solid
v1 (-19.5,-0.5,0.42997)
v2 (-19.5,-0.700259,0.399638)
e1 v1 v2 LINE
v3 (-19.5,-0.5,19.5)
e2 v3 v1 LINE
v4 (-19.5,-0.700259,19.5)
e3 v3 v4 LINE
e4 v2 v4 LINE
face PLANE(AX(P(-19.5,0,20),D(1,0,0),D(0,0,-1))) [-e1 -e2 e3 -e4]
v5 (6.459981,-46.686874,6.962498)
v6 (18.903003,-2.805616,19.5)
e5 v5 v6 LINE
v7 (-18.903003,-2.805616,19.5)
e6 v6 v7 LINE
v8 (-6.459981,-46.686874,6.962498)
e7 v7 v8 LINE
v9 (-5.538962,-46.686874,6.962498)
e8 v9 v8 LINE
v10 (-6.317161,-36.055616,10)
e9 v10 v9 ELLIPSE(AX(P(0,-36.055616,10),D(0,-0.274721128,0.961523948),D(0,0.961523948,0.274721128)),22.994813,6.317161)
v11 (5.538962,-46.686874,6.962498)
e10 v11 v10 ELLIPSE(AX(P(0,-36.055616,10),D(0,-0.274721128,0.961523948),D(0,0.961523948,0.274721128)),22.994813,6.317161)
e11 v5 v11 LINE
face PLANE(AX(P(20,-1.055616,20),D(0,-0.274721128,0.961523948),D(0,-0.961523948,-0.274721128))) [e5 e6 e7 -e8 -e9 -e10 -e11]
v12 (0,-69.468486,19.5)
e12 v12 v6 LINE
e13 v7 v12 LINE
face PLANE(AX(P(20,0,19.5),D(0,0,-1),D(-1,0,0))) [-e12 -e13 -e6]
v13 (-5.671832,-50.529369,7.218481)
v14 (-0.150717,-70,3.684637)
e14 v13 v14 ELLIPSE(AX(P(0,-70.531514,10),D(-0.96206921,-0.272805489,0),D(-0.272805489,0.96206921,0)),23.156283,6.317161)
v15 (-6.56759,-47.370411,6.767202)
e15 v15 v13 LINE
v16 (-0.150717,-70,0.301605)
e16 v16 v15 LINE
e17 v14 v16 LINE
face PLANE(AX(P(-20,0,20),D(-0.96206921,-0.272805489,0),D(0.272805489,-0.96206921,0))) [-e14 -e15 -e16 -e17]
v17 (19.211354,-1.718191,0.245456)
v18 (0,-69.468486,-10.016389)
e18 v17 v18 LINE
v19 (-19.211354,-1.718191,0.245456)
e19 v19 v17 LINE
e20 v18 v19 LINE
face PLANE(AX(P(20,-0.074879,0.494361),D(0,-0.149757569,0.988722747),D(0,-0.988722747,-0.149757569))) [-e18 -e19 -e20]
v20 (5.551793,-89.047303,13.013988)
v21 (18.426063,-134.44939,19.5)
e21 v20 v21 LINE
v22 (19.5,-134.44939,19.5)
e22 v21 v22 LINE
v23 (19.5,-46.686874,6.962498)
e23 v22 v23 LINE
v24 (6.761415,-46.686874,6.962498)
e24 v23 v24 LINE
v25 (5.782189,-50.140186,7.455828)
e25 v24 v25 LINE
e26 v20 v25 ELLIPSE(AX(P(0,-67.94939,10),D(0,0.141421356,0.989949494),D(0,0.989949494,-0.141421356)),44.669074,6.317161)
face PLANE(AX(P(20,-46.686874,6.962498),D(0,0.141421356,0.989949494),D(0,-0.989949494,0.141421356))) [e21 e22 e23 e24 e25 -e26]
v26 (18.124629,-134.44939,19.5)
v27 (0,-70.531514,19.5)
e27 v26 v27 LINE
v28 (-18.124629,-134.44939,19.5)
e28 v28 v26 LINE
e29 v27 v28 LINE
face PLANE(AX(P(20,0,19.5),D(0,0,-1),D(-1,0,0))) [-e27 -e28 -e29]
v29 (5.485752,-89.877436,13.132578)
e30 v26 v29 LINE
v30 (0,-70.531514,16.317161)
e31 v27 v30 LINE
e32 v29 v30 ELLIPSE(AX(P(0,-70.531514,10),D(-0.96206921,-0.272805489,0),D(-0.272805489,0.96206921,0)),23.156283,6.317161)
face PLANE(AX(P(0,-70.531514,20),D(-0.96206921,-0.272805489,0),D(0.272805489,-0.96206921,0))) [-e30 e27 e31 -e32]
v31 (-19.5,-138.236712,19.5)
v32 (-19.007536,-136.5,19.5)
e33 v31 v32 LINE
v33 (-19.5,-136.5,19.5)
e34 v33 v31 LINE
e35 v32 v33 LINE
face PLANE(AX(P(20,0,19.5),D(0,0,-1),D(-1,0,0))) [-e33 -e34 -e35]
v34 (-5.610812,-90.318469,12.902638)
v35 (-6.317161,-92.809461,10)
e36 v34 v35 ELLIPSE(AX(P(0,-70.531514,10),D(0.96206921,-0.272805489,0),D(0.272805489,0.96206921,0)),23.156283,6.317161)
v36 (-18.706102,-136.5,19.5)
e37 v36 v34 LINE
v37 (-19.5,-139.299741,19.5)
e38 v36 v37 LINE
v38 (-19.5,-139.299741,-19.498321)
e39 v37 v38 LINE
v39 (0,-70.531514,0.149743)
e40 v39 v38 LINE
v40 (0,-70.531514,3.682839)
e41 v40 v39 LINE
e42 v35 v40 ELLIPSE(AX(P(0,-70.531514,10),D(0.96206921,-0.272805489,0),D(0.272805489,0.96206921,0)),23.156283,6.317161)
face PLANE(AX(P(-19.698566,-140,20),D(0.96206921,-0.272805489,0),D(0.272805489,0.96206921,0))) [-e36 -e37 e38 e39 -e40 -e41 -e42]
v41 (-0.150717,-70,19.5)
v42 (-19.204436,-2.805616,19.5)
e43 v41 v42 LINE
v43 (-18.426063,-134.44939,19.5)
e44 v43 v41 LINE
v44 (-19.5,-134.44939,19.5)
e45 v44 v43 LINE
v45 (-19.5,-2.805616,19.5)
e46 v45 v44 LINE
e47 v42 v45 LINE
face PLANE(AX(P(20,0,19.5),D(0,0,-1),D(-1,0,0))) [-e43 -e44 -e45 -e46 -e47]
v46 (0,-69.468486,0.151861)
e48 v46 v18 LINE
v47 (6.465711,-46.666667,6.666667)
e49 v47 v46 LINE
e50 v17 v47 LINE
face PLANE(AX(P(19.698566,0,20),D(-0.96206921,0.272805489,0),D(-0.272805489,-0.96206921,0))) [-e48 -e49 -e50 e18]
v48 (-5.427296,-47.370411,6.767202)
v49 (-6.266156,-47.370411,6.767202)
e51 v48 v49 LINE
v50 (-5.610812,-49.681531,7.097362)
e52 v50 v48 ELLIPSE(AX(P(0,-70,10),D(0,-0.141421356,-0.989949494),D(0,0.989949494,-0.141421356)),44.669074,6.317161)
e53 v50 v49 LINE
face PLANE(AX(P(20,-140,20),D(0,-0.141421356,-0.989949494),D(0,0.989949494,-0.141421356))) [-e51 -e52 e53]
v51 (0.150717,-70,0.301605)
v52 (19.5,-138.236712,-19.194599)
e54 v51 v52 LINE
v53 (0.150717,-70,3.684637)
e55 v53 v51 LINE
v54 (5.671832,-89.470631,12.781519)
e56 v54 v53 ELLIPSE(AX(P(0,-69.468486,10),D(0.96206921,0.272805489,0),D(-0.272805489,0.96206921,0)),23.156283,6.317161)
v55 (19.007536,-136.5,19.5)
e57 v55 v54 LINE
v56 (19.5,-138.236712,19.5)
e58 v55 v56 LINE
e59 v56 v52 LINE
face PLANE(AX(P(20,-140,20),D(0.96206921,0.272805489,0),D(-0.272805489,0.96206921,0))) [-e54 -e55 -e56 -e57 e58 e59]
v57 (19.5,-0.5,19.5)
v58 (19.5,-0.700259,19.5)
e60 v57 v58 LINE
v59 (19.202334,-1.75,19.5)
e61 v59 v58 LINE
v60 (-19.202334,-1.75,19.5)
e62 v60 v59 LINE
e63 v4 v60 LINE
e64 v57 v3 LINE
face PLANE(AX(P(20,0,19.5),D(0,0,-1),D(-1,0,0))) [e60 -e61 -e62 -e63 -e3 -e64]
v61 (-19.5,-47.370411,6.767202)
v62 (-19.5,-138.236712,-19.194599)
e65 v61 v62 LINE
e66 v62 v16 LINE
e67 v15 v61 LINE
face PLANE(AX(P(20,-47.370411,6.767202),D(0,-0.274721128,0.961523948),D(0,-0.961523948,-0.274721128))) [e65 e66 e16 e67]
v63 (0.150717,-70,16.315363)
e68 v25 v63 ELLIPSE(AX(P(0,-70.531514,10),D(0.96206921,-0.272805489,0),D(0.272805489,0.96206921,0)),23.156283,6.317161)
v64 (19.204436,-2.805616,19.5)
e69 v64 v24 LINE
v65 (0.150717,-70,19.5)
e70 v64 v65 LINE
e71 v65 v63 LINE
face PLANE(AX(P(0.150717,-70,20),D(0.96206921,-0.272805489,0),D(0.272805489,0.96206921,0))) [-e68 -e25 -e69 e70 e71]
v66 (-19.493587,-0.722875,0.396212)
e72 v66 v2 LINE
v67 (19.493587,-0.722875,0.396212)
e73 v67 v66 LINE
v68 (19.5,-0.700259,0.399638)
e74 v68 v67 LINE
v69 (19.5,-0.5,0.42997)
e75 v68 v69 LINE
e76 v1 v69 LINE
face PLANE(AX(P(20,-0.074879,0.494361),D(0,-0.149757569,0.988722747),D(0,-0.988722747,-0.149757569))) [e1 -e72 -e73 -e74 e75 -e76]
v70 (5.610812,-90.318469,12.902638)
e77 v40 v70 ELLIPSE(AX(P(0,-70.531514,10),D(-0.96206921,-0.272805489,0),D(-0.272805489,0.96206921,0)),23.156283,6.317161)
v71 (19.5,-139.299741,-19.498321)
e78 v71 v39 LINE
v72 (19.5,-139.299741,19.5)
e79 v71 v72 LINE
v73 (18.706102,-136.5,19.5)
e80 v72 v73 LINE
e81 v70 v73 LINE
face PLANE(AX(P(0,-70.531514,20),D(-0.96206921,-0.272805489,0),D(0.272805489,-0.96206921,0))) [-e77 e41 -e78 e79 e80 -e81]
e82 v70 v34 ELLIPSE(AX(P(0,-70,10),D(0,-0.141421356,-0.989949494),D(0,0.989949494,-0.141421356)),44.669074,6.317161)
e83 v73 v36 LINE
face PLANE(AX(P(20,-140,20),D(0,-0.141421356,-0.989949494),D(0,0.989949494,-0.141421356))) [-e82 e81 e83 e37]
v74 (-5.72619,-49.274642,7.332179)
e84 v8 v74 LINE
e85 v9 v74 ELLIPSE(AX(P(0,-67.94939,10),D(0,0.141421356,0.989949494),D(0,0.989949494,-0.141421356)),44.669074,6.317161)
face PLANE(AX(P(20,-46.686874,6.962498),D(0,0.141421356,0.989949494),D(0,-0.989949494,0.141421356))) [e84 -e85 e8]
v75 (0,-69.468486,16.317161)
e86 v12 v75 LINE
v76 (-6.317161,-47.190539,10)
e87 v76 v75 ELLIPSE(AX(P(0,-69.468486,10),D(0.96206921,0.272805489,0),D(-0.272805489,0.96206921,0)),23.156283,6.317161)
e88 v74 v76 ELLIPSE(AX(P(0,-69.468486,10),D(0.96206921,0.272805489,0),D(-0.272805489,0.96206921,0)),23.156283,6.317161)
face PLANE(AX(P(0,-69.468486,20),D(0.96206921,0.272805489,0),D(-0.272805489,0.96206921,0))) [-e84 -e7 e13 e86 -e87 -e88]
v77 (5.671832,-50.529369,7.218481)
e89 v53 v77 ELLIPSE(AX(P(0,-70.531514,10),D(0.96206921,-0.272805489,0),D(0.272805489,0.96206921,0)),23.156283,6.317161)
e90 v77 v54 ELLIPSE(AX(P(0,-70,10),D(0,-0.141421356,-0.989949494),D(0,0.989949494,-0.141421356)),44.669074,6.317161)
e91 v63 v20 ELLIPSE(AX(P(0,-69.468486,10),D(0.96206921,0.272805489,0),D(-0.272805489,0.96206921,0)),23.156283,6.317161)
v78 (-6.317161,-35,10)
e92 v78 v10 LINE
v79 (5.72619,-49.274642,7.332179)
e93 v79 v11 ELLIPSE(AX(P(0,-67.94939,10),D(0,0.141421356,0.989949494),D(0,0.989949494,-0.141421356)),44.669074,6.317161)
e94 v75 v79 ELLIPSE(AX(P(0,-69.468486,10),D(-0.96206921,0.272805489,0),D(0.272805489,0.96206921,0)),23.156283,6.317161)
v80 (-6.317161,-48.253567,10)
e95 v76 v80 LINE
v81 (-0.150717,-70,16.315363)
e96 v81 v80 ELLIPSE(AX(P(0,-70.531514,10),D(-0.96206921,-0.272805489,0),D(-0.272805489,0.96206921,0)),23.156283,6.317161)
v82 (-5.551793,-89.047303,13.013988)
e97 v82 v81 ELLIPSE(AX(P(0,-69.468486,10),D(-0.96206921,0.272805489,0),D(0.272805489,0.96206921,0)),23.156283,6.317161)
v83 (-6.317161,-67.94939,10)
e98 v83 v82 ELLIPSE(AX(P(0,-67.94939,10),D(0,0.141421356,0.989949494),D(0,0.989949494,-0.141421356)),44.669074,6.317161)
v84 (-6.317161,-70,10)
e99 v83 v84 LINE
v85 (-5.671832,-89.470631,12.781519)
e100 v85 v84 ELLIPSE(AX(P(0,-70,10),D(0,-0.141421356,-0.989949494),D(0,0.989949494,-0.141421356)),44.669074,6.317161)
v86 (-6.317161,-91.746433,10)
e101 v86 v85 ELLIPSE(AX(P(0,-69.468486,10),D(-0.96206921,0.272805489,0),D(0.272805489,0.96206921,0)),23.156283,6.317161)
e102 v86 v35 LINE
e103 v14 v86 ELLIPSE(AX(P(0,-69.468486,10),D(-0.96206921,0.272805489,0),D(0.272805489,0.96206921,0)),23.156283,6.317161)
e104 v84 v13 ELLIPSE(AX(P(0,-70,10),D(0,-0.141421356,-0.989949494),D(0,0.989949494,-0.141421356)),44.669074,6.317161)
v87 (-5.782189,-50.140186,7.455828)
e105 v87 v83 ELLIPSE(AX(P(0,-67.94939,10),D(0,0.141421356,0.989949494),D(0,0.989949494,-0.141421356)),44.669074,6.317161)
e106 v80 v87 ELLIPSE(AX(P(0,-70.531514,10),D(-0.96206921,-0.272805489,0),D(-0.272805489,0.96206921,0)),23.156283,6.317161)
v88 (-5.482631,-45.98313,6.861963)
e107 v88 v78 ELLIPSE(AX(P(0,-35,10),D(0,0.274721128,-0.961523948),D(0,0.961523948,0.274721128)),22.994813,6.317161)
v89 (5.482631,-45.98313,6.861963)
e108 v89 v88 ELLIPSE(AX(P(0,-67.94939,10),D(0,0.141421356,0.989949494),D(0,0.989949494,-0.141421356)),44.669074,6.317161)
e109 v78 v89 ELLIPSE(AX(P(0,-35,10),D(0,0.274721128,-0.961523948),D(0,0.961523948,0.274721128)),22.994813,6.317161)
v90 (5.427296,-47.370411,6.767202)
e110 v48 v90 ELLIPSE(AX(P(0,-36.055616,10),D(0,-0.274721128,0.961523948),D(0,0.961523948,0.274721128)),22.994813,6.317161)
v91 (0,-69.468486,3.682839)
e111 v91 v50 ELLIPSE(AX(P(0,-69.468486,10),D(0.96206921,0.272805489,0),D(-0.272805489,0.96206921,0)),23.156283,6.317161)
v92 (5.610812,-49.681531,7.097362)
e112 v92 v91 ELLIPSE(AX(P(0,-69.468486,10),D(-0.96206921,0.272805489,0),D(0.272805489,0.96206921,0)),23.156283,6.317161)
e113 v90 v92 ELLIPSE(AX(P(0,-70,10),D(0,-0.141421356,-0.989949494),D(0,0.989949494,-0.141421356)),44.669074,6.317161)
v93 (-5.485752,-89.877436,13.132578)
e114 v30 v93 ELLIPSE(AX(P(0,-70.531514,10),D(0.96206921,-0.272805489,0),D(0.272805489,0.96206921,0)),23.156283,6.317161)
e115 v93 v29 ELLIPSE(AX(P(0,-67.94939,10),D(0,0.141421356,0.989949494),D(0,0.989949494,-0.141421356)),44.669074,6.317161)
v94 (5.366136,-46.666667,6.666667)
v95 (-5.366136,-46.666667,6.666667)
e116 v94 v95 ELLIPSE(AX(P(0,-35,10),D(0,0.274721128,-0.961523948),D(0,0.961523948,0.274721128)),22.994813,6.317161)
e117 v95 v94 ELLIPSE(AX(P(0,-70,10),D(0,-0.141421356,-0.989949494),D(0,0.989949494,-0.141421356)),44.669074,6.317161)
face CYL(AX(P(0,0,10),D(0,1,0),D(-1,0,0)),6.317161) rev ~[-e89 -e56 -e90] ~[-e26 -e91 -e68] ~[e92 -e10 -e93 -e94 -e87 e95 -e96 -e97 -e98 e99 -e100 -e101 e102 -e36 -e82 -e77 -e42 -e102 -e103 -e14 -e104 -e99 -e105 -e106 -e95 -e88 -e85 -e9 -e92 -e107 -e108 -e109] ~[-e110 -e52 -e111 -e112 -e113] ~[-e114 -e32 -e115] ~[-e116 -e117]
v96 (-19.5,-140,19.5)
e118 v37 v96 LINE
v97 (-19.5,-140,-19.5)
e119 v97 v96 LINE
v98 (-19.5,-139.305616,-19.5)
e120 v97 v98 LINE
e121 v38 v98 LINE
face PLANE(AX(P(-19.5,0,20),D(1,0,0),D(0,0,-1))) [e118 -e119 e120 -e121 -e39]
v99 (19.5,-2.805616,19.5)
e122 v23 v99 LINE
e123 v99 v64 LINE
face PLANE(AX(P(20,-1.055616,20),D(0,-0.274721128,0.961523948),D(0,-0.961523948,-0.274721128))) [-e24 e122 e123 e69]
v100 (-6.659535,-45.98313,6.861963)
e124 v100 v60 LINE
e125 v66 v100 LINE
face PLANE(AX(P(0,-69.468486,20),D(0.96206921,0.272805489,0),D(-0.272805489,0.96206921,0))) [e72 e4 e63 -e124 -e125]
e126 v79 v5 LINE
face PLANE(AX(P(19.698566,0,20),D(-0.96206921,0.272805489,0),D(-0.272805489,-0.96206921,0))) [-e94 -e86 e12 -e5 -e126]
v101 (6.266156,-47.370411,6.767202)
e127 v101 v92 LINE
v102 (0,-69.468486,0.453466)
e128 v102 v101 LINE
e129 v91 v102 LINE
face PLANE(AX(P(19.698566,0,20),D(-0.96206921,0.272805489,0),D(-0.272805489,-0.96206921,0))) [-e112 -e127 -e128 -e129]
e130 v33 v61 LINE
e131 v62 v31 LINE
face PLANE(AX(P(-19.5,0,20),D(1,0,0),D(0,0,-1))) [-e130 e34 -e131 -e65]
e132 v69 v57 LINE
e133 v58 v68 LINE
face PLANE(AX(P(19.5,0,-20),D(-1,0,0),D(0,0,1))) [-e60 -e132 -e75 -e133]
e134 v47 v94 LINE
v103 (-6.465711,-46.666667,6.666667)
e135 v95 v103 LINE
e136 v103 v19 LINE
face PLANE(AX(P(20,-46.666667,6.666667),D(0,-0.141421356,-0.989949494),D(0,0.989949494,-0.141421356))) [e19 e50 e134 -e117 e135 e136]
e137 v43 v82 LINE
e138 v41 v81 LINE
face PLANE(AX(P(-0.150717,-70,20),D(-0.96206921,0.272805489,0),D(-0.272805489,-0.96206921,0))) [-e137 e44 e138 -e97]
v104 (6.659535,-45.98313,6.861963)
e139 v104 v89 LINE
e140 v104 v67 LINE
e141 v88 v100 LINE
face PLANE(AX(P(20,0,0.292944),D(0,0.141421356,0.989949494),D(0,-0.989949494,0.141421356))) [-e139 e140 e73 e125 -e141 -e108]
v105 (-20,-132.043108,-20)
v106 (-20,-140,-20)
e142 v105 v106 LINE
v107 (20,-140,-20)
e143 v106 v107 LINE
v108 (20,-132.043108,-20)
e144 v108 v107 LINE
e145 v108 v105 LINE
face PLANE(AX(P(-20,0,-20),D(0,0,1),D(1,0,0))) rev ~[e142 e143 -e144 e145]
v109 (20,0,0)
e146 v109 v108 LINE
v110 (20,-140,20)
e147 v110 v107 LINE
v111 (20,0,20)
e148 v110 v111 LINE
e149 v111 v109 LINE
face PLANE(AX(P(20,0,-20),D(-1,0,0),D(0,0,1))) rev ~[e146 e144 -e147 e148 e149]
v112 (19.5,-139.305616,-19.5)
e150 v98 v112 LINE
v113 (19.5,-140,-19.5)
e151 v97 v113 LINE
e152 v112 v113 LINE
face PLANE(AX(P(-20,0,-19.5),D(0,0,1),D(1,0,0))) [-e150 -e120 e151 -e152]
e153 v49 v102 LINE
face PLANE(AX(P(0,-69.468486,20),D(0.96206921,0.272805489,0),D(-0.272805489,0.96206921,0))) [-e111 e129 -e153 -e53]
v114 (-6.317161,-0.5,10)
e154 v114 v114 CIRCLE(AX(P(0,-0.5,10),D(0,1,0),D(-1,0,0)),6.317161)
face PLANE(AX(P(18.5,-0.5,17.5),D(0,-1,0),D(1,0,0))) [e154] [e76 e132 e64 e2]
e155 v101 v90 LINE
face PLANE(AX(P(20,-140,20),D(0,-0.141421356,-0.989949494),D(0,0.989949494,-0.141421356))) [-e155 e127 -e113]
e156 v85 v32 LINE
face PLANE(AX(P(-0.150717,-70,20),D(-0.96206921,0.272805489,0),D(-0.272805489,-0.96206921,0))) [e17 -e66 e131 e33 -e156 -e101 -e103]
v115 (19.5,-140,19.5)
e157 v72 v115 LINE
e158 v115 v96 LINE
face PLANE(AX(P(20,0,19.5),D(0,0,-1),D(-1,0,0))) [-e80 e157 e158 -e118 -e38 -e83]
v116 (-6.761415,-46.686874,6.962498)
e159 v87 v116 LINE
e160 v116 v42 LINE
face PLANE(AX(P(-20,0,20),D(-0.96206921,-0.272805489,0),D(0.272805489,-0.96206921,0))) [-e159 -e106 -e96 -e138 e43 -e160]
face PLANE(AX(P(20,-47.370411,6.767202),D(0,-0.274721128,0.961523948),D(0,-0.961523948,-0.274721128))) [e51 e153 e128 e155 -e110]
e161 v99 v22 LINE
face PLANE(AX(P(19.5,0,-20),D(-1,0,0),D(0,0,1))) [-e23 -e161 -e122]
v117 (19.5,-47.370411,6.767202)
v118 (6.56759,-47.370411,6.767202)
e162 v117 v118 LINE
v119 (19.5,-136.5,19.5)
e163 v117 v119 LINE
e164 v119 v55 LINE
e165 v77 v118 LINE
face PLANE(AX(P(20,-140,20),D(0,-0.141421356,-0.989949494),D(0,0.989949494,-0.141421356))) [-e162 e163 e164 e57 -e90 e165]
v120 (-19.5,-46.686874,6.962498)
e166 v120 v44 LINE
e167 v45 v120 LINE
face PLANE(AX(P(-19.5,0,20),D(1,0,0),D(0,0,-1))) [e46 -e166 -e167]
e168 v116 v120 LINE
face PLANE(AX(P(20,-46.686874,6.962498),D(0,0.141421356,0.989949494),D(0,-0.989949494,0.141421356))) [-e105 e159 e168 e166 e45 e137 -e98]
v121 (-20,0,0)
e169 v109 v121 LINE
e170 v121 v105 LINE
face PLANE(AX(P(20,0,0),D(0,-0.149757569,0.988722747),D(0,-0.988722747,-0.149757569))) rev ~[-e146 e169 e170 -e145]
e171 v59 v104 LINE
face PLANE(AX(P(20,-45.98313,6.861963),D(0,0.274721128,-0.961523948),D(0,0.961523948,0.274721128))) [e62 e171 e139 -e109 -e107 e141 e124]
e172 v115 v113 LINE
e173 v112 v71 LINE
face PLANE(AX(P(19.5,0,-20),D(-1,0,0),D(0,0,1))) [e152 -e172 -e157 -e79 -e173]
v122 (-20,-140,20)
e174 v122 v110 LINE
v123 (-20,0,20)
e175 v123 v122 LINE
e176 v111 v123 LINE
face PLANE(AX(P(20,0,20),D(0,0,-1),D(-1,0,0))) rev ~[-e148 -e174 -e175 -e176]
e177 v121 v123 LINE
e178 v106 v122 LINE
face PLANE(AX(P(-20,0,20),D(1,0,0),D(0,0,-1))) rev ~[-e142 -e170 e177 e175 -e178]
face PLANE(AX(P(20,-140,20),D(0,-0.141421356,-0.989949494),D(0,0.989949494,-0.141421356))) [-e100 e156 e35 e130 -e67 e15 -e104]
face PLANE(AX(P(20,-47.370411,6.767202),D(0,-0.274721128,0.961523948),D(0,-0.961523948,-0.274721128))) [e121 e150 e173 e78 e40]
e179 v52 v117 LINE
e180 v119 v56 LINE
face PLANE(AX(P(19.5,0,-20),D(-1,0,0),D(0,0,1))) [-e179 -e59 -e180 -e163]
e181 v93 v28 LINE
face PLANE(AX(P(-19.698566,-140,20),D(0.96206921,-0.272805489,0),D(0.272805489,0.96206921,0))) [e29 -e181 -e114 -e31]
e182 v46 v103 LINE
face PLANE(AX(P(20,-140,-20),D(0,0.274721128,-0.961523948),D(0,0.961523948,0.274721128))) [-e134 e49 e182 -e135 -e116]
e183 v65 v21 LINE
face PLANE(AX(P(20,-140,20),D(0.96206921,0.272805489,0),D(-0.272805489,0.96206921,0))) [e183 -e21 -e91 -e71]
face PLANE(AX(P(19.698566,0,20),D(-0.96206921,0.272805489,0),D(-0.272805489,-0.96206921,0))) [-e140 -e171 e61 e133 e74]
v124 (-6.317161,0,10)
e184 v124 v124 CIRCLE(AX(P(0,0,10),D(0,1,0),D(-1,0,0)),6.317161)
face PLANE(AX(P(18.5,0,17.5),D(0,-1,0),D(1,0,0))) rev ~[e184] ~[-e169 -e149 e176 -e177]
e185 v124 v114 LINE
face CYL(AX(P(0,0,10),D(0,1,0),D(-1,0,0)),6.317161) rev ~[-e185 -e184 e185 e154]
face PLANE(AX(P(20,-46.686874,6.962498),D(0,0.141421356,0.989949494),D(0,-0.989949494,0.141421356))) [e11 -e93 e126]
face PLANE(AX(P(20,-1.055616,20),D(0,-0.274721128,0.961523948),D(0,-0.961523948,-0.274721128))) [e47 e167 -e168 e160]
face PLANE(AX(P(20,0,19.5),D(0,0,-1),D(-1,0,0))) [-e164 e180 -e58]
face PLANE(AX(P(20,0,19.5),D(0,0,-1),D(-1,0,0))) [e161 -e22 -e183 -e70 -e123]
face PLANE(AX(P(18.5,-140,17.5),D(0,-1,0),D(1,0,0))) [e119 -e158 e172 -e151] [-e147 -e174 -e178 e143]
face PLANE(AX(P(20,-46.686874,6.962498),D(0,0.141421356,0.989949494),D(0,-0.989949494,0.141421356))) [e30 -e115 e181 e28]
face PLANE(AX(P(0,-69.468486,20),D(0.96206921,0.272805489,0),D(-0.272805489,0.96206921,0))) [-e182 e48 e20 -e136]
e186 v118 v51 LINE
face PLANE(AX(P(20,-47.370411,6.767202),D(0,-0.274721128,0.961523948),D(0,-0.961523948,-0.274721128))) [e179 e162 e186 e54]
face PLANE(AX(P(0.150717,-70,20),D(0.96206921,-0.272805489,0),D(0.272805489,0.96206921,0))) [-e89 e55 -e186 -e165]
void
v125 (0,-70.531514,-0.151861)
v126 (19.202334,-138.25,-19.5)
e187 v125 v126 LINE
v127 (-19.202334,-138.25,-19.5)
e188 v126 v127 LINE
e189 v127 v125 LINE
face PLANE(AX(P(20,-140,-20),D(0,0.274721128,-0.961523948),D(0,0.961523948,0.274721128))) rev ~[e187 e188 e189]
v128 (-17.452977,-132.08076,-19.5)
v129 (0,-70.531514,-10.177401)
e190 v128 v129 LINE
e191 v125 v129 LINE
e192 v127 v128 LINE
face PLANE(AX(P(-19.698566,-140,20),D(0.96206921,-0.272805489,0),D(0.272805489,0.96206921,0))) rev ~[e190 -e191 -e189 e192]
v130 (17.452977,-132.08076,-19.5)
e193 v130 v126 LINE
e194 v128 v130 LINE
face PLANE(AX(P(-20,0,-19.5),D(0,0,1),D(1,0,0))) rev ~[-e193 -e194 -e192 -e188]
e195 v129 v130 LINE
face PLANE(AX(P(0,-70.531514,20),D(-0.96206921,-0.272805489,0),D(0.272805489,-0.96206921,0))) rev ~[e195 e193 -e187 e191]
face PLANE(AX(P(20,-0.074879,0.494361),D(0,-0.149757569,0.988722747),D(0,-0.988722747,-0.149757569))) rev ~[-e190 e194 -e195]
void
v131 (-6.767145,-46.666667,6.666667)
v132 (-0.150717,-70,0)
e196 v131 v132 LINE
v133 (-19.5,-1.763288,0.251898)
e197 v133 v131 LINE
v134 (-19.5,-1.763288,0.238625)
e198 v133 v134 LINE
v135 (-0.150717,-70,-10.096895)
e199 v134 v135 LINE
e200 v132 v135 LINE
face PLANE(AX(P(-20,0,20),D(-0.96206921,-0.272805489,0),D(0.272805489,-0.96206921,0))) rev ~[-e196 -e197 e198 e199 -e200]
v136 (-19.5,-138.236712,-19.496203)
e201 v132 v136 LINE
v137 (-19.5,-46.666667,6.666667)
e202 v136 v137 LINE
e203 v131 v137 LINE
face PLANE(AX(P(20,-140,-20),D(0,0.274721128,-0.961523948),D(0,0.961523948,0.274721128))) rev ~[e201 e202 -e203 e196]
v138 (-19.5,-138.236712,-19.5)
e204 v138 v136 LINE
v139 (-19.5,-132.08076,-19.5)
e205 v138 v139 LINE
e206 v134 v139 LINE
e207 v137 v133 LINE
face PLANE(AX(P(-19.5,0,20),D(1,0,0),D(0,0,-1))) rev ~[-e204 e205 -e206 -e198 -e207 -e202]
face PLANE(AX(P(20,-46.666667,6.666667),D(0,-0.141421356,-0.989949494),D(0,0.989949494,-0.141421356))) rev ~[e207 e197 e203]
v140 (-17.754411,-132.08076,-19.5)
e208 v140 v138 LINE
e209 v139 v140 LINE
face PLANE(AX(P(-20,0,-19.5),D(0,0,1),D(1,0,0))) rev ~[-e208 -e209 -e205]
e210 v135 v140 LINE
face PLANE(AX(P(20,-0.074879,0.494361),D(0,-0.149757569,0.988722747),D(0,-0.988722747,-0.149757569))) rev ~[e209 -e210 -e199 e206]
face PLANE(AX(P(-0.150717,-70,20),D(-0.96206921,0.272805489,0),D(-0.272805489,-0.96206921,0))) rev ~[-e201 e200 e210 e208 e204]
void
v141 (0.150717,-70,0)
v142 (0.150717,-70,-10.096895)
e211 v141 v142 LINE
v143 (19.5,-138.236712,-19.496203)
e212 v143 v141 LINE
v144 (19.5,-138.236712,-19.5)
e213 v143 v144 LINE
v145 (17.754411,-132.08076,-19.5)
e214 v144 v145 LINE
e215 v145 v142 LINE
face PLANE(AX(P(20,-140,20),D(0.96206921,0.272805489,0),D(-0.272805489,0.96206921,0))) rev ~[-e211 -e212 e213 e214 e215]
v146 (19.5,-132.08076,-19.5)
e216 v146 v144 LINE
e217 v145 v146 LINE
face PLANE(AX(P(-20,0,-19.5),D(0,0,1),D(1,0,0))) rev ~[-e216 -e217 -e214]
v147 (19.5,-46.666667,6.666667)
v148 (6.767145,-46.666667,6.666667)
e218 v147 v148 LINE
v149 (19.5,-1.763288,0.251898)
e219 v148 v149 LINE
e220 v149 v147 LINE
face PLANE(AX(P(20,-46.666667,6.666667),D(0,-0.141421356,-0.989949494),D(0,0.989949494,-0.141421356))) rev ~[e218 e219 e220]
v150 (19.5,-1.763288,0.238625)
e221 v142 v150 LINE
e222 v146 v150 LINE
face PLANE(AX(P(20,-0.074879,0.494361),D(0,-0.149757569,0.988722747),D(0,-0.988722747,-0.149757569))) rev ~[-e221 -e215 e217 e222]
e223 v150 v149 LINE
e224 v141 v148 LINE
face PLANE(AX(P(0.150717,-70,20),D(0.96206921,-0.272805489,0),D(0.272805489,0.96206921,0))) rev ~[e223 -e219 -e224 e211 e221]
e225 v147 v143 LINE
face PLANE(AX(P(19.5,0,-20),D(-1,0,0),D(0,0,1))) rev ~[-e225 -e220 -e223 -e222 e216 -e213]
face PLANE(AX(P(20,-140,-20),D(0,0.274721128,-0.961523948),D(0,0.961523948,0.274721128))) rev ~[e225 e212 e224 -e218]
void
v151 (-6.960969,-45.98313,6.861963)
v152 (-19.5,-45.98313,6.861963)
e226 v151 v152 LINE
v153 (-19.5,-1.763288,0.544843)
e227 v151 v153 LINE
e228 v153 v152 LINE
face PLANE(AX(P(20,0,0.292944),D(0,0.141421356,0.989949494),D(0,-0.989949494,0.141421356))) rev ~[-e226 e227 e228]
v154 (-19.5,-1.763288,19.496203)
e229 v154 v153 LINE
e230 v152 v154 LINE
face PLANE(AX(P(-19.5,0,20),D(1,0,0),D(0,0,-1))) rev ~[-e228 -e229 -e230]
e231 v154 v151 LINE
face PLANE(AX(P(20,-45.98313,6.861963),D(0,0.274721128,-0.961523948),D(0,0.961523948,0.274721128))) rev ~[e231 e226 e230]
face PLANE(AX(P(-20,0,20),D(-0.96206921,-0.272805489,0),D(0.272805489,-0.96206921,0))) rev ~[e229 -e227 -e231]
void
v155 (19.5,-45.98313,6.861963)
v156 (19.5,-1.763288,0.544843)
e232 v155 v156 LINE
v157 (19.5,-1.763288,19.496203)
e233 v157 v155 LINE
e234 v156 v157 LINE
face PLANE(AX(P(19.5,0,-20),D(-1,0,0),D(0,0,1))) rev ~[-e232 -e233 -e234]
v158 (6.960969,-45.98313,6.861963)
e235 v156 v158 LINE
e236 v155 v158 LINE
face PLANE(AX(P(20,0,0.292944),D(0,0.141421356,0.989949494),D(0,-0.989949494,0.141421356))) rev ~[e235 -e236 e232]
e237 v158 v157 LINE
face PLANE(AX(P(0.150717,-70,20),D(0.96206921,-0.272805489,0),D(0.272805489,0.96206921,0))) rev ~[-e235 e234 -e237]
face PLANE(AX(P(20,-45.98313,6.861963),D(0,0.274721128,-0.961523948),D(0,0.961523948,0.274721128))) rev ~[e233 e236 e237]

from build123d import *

# Parameters (mm, degrees)
F0_W      = 34
F0_H      = 1.332180649
F0_W_2    = 3
F0_H_2    = 30
F1_DEPTH  = 140
F3_DEPTH  = 50
F4_DEPTH  = 40
F5_T      = -0.5
F7_REACH  = 112.8020988928
F9_DEPTH  = 40
F11_DEPTH = 1000
F12_R     = 6.3171610822
F13_DEPTH = 140


# Not quite as in the source:
# - a feature names something its author has since deleted; it is built from what else it names


with BuildPart() as f1:
    # F0 (on Front) → F1 (new body)
    with BuildSketch(Plane.XZ):
        Polygon((20, 20), (17, 20), (17, 18.832180649), (17, 17.5), (17, 15), (20, 15), align=None)
        Polygon((15, 20), (-15, 20), (-17, 20), (-17, 18.832180649), (17, 18.832180649), (17, 20), align=None)
        with Locations((0, 18.1660903245)):
            Rectangle(F0_W, F0_H)
        Polygon((17, 17.5), (-17, 17.5), (-17, 15), (-17, -15), (-15, -15), (15, -15), (17, -15), (17, 15), align=None)
        Polygon((-18.5, 15), (-20, 15), (-20, -11.8550653383), (-20, -15), (-18.5, -15), (-18.5, -5.2632528394), (-18.5, -3.2632528394), (-18.5, 2.7367471606), (-18.5, 4.7367471606), align=None)
        with Locations((18.5, 0)):
            Rectangle(F0_W_2, F0_H_2)
        with BuildLine():
            Line((-15, -20), (15, -20))
            Line((15, -20), (15, -17.5))
            Line((15, -17.5), (11.391207267, -17.5))
            ThreePointArc((11.391207267, -17.5), (10.2485464886, -18.6426607784), (9.1058857102, -17.5))
            Line((9.1058857102, -17.5), (7.9234171988, -17.5))
            ThreePointArc((7.9234171988, -17.5), (5.948765669, -19.4746515298), (3.9741141393, -17.5))
            Line((3.9741141393, -17.5), (2.0740236579, -17.5))
            ThreePointArc((2.0740236579, -17.5), (0, -19.5740236579), (-2.0740236579, -17.5))
            Line((-2.0740236579, -17.5), (-3.9741141393, -17.5))
            ThreePointArc((-3.9741141393, -17.5), (-5.948765669, -19.4746515298), (-7.9234171988, -17.5))
            Line((-7.9234171988, -17.5), (-9.1058857102, -17.5))
            ThreePointArc((-9.1058857102, -17.5), (-10.2485464886, -18.6426607784), (-11.391207267, -17.5))
            Line((-11.391207267, -17.5), (-15, -17.5))
            Line((-15, -17.5), (-15, -20))
        make_face()
        Polygon((20, -20), (20, -15), (17, -15), (15, -15), (15, -17.5), (15, -20), align=None)
        Polygon((-17, -15), (-17, 15), (-18.5, 15), (-18.5, 4.7367471606), (-18.5, 2.7367471606), (-18.5, -3.2632528394), (-18.5, -5.2632528394), (-18.5, -15), align=None)
        Polygon((-15, -17.5), (-15, -15), (-16.767766953, -16.767766953), (-17.5, -17.5), (-15, -20), align=None)
        Polygon((-15, -15), (-17, -15), (-18.5, -15), (-20, -15), (-17.5, -17.5), (-16.767766953, -16.767766953), align=None)
        Polygon((-17, 18.832180649), (-17, 20), (-20, 20), (-20, 15), (-18.5, 15), (-17, 15), (-17, 17.5), align=None)
        Polygon((-17.5, -17.5), (-20, -15), (-20, -20), (-15, -20), align=None)
        with BuildLine():
            Line((3.9741141393, -17.5), (7.9234171988, -17.5))
            ThreePointArc((7.9234171988, -17.5), (5.948765669, -15.5253484702), (3.9741141393, -17.5))
        make_face()
        with BuildLine():
            ThreePointArc((3.9741141393, -17.5), (5.948765669, -19.4746515298), (7.9234171988, -17.5))
            Line((7.9234171988, -17.5), (3.9741141393, -17.5))
        make_face()
        with BuildLine():
            ThreePointArc((9.1058857102, -17.5), (10.2485464886, -18.6426607784), (11.391207267, -17.5))
            Line((11.391207267, -17.5), (9.1058857102, -17.5))
        make_face()
        with BuildLine():
            Line((9.1058857102, -17.5), (11.391207267, -17.5))
            ThreePointArc((11.391207267, -17.5), (10.2485464886, -16.3573392216), (9.1058857102, -17.5))
        make_face()
        with BuildLine():
            ThreePointArc((2.0740236579, -17.5), (0, -15.4259763421), (-2.0740236579, -17.5))
            Line((-2.0740236579, -17.5), (2.0740236579, -17.5))
        make_face()
        with BuildLine():
            Line((2.0740236579, -17.5), (-2.0740236579, -17.5))
            ThreePointArc((-2.0740236579, -17.5), (0, -19.5740236579), (2.0740236579, -17.5))
        make_face()
        with BuildLine():
            Line((-3.9741141393, -17.5), (-7.9234171988, -17.5))
            ThreePointArc((-7.9234171988, -17.5), (-5.948765669, -19.4746515298), (-3.9741141393, -17.5))
        make_face()
    extrude(amount=F1_DEPTH)


with BuildPart() as f1b:
    # F0 (on Front) → F1, piece 2 (new body)
    with BuildSketch(Plane.XZ):
        with BuildLine():
            ThreePointArc((-9.1058857102, -17.5), (-10.2485464886, -16.3573392216), (-11.391207267, -17.5))
            Line((-11.391207267, -17.5), (-9.1058857102, -17.5))
        make_face()
    extrude(amount=F1_DEPTH)


with BuildPart() as f3_tool:
    # F2 (on face) → F3 (new body)
    with BuildSketch(Plane.YZ.offset(20)):
        Polygon((0, 0), (-132.0431083441, -20), (0, -20), align=None)
    extrude(amount=-F3_DEPTH)


with BuildPart() as f1_1:
    add(f1.part)

    # F3: cut by f3_tool
    add(f3_tool.part, mode=Mode.SUBTRACT)



with BuildPart() as f1b_1:
    add(f1b.part)

    # F3: cut by f3_tool
    add(f3_tool.part, mode=Mode.SUBTRACT)


with BuildPart() as f1_2:
    add(f1_1.part)

    add(f1b_1.part)  # F4 merges F1b
    # F2 (on face) → F4 (join)
    with BuildSketch(Plane.YZ.offset(20)):
        Polygon((-133.1249161121, -12.857736984), (-132.0431083441, -20), (0, 0), (0, 7.3061197718), align=None)
        Polygon((-140, -20), (-132.0431083441, -20), (-133.1249161121, -12.857736984), (-140, -13.8990762821), align=None)
    extrude(amount=-F4_DEPTH)

    # F5
    f5_openings = [f1_2.faces().sort_by_distance(p)[0] for p in [
        (0, -140, 0),
    ]]
    offset(amount=F5_T, openings=f5_openings)

    f7_end = Plane(origin=(0, -66.021554172, -10), x_dir=(0, -0.988722747, -0.1497575692), z_dir=(0, 0.1497575692, -0.988722747))
    # F6 (on face) → F7 (join, up to a plane its end follows)
    with BuildSketch(Plane.XY.offset(20)):
        Polygon((0, -70), (-0.1507168075, -70), (0, -70.5315142328), (0.1507168075, -70), align=None)
        Polygon((0, -69.4684857672), (-0.1507168075, -70), (0, -70), (0.1507168075, -70), align=None)
        Polygon((0.1507168075, -70), (0, -70.5315142328), (19.6985663849, -140), (20, -140), align=None)
        Polygon((0, -70.5315142328), (-0.1507168075, -70), (-20, -140), (-19.6985663849, -140), align=None)
        Polygon((19.6985663849, 0), (0, -69.4684857672), (0.1507168075, -70), (20, 0), align=None)
        Polygon((-19.6985663849, 0), (-20, 0), (-0.1507168075, -70), (0, -69.4684857672), align=None)
    f7_long = extrude(amount=-F7_REACH, mode=Mode.PRIVATE)
    add(split(f7_long, bisect_by=f7_end, keep=Keep.BOTTOM, mode=Mode.PRIVATE))

    # F8 (on face) → F9 (join, through all)
    with BuildSketch(Plane.YZ.offset(20)):
        Polygon((-47.3704106226, 6.7672015175), (-46.6666666667, 6.6666666667), (-45.9831301115, 6.8619628253), (-46.6868740675, 6.9624976761), align=None)
        Polygon((-46.6868740675, 6.9624976761), (-45.9831301115, 6.8619628253), (0, 20), (-1.0556159339, 20), align=None)
        Polygon((-140, 20), (-47.3704106226, 6.7672015175), (-46.6868740675, 6.9624976761), (-137.9493903346, 20), align=None)
        Polygon((-45.9831301115, 6.8619628253), (-46.6666666667, 6.6666666667), (0, 0), (0, 0.2929442379), align=None)
        Polygon((-140, -19.6983954474), (-140, -20), (-46.6666666667, 6.6666666667), (-47.3704106226, 6.7672015175), align=None)
    extrude(amount=-F9_DEPTH)

    # F10 (on face) → F11 (cut)
    with BuildSketch(Plane(origin=(-20, 0, 0), x_dir=(0, -1, 0), z_dir=(-1, 0, 0))):
        Polygon((140, -20), (132.0431083441, -20), (132.0431083441, -21.8775942922), (142.034560442, -23.4243907034), (141.5658295155, -20), align=None)
    extrude(amount=-F11_DEPTH, mode=Mode.SUBTRACT)

    # F12 (on face) → F13 (cut, through all)
    with BuildSketch(Plane(origin=(0, 0, 0), x_dir=(-1, 0, 0), z_dir=(0, 1, 0))):
        with Locations((0, 10)):
            Circle(F12_R)
    extrude(amount=-F13_DEPTH, mode=Mode.SUBTRACT)


solid = f1_2.part
